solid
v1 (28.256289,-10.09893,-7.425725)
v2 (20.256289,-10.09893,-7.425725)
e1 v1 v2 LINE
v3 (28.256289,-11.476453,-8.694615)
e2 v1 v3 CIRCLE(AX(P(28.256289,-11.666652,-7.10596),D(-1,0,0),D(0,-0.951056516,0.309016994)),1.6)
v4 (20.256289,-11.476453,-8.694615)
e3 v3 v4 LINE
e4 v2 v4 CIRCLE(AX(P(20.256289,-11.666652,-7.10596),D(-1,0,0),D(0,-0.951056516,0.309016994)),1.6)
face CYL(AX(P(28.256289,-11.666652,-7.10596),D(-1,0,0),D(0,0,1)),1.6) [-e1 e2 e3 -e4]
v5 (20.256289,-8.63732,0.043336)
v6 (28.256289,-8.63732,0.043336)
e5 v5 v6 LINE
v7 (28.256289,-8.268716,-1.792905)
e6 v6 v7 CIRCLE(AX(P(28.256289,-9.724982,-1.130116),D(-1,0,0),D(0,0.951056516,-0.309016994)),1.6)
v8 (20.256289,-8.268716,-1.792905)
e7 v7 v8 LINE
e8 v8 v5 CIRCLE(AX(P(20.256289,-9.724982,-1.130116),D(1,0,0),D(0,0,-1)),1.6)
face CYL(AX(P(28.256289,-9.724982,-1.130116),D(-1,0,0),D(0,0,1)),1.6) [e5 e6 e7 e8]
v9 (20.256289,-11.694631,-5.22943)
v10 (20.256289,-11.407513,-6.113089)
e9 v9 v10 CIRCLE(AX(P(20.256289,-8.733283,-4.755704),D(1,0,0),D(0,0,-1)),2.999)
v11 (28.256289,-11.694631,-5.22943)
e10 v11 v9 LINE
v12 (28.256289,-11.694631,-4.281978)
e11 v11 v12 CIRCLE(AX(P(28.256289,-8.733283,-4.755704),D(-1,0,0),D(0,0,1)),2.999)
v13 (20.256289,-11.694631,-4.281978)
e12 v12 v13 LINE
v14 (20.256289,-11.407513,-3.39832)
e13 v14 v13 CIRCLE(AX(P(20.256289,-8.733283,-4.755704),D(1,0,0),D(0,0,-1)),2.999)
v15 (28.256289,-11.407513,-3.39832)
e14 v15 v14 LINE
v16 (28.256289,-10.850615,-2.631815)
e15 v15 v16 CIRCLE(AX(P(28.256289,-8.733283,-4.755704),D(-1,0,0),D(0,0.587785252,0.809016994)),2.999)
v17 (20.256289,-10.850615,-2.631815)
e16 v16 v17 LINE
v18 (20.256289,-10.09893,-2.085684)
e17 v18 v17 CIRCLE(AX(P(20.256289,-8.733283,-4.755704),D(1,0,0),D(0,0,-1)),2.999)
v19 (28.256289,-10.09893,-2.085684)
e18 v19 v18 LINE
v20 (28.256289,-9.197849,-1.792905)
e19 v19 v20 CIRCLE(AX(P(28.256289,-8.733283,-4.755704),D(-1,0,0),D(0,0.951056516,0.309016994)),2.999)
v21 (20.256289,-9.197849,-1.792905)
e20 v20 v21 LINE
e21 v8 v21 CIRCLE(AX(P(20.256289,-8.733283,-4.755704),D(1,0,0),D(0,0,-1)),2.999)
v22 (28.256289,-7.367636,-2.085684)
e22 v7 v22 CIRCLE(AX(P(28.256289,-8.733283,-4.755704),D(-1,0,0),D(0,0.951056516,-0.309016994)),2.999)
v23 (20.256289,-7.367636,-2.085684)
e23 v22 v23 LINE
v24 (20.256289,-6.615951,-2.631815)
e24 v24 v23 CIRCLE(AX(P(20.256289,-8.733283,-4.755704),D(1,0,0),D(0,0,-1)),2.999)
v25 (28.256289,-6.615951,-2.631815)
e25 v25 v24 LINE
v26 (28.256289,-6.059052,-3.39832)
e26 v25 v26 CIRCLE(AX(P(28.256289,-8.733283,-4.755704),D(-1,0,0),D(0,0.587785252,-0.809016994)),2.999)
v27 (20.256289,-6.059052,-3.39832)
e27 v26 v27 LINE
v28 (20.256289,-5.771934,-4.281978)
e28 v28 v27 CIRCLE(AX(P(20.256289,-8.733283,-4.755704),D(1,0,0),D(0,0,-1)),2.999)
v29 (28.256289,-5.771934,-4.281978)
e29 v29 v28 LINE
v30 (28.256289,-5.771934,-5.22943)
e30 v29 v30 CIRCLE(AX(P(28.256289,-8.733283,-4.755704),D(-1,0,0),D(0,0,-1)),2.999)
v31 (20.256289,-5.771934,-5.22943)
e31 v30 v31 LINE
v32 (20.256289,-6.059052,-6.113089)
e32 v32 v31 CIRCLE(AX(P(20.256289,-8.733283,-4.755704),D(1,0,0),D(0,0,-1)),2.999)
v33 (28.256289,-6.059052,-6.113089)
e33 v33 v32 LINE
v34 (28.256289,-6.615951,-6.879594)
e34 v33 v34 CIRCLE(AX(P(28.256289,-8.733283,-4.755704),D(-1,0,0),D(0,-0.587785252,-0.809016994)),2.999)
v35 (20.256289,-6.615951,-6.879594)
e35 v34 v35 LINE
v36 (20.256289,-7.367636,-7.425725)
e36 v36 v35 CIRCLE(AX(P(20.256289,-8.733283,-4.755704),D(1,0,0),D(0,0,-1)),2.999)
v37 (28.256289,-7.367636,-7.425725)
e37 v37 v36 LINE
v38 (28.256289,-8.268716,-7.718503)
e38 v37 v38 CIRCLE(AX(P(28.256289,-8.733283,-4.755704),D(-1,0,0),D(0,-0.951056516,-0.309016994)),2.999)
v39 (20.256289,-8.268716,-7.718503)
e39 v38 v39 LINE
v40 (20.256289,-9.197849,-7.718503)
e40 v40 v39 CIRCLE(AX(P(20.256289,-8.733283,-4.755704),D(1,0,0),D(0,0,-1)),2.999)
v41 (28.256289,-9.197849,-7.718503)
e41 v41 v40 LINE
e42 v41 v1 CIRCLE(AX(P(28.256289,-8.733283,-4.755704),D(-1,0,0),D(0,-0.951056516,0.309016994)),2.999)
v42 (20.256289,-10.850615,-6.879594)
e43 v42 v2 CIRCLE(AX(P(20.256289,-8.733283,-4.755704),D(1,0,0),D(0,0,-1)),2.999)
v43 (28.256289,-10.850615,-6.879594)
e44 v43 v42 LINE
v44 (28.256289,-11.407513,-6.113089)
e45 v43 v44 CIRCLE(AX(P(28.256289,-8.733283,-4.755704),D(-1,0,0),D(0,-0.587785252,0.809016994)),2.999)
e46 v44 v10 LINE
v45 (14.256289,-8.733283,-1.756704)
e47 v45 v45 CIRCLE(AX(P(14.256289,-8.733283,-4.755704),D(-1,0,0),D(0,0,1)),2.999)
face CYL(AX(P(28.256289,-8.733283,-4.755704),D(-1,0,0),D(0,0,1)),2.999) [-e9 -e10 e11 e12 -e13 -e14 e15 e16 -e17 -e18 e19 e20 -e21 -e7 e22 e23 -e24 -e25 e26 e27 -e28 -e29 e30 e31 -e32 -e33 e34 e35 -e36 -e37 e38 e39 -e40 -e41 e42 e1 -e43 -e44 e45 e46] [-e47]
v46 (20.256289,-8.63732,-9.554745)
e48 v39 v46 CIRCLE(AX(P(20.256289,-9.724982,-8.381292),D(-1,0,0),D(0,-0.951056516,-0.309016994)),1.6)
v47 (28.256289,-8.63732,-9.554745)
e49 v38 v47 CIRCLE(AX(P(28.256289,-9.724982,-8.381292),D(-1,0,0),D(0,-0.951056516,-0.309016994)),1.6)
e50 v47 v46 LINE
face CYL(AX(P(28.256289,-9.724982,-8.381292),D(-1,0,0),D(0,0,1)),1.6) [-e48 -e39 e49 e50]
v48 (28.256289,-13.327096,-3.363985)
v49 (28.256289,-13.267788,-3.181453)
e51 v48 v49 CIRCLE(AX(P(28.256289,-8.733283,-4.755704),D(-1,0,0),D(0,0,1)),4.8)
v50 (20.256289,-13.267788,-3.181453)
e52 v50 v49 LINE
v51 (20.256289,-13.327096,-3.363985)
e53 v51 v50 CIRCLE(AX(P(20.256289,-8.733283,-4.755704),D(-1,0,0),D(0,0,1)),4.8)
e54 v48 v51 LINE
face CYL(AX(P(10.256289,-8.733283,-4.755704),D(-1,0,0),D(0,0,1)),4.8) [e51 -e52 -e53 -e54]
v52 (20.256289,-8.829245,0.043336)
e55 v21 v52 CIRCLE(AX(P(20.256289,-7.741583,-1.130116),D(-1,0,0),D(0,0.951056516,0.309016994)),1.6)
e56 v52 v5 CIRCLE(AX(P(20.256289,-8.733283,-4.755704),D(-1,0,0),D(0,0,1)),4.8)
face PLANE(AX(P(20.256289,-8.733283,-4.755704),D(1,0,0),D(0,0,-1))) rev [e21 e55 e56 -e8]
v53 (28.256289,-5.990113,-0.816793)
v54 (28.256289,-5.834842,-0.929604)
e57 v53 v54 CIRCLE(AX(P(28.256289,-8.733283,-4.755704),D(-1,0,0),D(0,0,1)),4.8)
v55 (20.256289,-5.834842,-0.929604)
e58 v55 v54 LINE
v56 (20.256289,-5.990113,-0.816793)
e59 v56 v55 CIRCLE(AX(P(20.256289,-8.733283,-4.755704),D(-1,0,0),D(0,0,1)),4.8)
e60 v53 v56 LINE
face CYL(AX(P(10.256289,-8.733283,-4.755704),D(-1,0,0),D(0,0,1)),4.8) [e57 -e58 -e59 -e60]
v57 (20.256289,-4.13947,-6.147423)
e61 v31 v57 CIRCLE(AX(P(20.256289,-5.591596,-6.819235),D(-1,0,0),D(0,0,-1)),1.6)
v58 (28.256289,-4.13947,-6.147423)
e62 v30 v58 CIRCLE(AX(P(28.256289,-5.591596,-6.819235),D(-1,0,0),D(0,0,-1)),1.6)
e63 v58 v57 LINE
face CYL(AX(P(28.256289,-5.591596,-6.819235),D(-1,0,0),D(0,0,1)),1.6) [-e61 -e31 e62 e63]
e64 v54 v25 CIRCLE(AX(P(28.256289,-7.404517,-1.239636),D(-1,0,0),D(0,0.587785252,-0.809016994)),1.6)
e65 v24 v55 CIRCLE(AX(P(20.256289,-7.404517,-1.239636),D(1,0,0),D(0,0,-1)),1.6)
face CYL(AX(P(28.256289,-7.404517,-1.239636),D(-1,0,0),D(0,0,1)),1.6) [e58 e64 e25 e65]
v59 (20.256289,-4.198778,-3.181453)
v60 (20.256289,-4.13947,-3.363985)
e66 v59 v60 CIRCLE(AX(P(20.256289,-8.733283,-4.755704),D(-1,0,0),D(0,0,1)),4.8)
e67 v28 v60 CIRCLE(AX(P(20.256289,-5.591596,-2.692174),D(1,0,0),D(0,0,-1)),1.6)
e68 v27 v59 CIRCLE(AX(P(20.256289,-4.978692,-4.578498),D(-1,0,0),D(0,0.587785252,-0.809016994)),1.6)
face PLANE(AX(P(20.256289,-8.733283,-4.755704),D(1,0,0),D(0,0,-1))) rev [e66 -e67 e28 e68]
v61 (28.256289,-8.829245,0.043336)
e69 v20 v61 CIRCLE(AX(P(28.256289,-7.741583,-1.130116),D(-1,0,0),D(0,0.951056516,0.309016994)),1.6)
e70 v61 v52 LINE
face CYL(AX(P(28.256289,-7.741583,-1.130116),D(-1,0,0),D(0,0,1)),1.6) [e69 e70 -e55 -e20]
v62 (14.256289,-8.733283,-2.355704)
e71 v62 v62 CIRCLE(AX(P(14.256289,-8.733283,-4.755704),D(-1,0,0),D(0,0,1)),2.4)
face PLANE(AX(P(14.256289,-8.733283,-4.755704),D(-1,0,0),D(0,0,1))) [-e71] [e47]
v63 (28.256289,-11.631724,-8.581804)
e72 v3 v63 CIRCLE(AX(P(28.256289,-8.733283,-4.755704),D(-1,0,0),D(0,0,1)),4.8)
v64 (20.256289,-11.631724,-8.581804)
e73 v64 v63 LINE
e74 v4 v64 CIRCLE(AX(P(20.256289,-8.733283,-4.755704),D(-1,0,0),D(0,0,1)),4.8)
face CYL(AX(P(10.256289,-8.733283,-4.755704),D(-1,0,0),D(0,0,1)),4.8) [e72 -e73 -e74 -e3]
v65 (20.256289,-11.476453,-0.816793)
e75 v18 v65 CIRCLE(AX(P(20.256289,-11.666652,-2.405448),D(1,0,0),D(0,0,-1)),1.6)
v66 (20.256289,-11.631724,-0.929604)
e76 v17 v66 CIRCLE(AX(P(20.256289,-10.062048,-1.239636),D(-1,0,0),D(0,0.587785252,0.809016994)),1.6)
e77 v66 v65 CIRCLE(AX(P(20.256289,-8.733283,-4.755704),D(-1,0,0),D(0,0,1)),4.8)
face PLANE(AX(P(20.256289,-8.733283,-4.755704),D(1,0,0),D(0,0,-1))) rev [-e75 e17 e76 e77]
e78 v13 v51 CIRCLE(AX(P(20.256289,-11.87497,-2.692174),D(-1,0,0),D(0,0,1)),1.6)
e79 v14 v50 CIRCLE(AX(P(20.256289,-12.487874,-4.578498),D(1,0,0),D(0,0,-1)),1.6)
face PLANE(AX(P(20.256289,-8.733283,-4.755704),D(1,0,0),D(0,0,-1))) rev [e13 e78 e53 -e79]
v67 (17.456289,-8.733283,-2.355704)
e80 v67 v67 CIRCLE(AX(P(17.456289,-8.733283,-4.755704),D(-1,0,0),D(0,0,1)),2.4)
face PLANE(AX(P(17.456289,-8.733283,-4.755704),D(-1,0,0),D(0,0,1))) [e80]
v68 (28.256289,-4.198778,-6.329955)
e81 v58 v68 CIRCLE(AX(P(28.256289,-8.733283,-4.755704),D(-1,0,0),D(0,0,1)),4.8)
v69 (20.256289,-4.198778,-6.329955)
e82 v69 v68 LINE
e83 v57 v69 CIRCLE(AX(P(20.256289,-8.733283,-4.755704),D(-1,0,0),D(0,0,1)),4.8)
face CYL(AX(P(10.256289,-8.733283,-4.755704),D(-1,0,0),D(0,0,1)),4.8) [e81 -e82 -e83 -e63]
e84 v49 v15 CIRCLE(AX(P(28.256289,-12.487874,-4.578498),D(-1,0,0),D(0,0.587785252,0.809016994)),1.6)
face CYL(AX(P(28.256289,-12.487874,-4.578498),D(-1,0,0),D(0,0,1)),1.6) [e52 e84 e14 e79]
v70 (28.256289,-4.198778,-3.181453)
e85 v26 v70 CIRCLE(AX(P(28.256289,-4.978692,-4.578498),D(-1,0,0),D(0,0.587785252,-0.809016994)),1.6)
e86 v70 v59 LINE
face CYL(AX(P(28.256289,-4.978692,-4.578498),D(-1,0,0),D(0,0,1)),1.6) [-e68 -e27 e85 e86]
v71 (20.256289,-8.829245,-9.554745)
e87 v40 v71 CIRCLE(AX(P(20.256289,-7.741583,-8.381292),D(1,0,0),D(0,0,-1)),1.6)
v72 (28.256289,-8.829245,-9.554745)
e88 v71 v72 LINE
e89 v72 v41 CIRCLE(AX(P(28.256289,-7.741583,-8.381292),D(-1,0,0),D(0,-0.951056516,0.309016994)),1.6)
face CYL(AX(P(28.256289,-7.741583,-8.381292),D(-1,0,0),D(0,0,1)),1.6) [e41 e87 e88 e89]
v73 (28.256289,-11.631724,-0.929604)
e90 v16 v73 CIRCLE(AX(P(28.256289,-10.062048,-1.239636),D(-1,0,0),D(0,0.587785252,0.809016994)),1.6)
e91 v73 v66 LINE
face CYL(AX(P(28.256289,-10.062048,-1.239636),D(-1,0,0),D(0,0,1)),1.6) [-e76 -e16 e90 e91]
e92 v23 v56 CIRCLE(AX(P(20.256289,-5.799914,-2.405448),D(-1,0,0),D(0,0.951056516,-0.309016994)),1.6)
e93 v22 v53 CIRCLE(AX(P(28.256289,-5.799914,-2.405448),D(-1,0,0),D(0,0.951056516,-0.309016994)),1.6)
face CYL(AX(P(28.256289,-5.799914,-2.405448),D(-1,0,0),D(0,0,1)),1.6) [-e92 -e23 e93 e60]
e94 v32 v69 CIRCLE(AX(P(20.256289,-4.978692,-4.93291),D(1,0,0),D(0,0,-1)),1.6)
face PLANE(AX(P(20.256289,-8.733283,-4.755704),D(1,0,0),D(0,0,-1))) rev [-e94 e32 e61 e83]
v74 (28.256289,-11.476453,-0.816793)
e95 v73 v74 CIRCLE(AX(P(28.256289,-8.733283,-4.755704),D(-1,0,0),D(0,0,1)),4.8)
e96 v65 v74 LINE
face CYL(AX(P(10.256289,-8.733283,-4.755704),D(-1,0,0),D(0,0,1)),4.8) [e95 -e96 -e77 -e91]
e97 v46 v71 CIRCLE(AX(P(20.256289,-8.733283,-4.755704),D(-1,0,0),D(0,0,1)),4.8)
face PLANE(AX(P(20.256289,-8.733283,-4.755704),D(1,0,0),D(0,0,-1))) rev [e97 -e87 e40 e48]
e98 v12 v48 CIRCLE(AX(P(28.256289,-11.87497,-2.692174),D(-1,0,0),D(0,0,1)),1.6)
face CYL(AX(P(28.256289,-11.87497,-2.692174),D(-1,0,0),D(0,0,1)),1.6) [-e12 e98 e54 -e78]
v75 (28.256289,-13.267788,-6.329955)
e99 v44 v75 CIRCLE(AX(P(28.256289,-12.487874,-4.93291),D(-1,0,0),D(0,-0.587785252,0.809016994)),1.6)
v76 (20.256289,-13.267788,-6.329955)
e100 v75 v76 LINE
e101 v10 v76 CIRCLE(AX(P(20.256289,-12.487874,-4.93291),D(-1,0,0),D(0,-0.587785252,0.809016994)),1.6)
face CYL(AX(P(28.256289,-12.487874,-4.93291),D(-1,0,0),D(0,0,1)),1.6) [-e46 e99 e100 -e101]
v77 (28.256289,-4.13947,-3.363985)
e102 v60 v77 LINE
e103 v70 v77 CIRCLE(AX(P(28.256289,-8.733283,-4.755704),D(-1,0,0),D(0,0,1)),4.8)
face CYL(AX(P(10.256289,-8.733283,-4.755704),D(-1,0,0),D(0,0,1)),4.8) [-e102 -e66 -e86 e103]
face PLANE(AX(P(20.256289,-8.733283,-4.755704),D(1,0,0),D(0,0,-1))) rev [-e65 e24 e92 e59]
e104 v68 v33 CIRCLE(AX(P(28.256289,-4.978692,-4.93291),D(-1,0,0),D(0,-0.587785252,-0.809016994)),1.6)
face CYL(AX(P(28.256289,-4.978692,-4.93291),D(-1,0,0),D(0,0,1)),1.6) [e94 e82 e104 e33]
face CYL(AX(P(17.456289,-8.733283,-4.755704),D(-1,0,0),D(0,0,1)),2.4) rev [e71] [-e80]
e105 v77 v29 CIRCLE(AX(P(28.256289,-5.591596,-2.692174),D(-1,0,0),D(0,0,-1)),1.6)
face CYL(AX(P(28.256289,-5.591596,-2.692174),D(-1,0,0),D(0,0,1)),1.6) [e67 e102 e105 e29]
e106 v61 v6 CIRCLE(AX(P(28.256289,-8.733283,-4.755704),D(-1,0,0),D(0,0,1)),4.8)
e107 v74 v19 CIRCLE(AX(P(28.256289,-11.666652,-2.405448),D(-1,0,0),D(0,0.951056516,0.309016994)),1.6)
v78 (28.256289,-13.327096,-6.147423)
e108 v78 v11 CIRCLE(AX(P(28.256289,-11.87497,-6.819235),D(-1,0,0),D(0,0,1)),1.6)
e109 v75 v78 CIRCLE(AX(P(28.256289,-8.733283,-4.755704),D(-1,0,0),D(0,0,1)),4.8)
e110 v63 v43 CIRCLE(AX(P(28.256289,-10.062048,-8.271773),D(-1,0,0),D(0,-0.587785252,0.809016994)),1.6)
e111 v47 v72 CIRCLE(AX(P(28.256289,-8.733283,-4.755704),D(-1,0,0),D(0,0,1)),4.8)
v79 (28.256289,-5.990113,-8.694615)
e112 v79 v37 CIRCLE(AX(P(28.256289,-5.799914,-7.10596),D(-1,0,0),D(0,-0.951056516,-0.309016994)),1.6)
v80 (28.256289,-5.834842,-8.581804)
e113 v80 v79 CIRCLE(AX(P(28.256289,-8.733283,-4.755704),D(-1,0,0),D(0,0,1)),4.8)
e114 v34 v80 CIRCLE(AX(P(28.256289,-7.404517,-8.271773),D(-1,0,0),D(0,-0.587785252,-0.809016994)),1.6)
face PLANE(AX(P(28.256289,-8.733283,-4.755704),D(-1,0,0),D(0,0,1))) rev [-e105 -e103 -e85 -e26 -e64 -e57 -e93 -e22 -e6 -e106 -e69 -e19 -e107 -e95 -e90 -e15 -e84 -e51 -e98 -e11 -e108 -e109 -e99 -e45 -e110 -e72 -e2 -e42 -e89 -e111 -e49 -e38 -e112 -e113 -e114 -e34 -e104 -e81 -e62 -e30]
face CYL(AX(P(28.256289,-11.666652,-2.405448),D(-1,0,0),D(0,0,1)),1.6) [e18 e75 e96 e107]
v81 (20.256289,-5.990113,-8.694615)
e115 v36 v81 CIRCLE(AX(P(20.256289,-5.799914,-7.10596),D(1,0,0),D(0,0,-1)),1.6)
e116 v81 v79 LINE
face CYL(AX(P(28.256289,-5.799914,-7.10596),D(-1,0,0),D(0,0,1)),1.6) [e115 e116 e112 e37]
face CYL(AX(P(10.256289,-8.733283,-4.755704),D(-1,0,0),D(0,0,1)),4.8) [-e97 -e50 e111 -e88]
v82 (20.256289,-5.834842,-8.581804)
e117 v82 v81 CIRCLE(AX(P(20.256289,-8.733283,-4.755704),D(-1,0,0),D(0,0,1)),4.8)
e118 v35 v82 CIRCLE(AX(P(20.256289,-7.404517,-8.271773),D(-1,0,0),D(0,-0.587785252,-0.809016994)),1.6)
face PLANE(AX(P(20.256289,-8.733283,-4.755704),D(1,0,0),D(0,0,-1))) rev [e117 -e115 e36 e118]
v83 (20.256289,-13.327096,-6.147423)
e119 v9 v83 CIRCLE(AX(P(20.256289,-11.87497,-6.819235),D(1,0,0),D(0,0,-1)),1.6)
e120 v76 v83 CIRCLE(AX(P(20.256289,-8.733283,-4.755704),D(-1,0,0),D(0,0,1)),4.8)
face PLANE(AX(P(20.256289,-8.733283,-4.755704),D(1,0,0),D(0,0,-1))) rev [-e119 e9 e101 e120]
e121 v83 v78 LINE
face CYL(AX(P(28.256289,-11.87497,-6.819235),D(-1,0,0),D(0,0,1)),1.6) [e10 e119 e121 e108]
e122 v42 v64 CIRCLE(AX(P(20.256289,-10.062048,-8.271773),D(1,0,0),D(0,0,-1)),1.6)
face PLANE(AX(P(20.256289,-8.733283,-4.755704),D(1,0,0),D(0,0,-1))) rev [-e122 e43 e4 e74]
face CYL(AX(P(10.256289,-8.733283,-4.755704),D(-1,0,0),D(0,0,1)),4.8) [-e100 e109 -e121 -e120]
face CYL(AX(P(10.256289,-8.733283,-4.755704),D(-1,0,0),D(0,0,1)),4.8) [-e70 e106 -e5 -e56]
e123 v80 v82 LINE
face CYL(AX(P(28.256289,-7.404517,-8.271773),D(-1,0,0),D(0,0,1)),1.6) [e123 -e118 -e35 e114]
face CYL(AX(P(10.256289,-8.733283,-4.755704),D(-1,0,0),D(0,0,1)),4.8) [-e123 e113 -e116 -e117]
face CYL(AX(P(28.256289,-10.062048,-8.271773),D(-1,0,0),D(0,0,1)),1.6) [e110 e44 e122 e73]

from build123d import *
from build123d.topology import SkipClean

# Parameters (mm, degrees)
ISO_START                                 = 20.256289073
ISO_SPUR_GEAR_0_8M_10T_20PA_8FW_2_R       = 0.4
ISO_SPUR_GEAR_0_8M_10T_20PA_8FW_S10_DEPTH = 8
BOSS_EXTRUDE1_DEPTH                       = 6
BOSS_EXTRUDE1_DEPTH_BACK                  = 8
SKETCH1_R                                 = 2.999
SKETCH2_R                                 = 2.4
CUT_EXTRUDE1_DEPTH                        = 3.2


# Read off the part's stored shape, not the designer's step: ISO - Spur gear 0.8M 10T 20PA 8FW ---S10A75H50L0.8N
with BuildPart() as part:
    # ISO - Spur gear 0.8M 10T 20PA 8FW -- 2 → ISO - Spur gear 0.8M 10T 20PA 8FW ---S10 (new body)
    with BuildSketch(Plane.YZ.offset(ISO_START)):
        with BuildLine():
            ThreePointArc((-8.829245422, -9.554744908), (-8.733282752, -9.555704257), (-8.637320082, -9.554744908))
            ThreePointArc((-8.637320082, -9.554744908), (-8.156276182, -8.696191622), (-8.268716011, -7.718503397))
            ThreePointArc((-8.268716011, -7.718503397), (-7.806540786, -7.60792275), (-7.367635501, -7.425724592))
            ThreePointArc((-7.367635501, -7.425724592), (-6.883930514, -8.282781454), (-5.990112863, -8.694615143))
            ThreePointArc((-5.990112863, -8.694615143), (-5.911913541, -8.63898583), (-5.834842001, -8.581804258))
            ThreePointArc((-5.834842001, -8.581804258), (-5.950314271, -7.604469549), (-6.615950723, -6.879593633))
            ThreePointArc((-6.615950723, -6.879593633), (-6.307040786, -6.518472229), (-6.059052342, -6.113088769))
            ThreePointArc((-6.059052342, -6.113088769), (-5.163961403, -6.522147678), (-4.198777965, -6.329955298))
            ThreePointArc((-4.198777965, -6.329955298), (-4.168211474, -6.23898583), (-4.139469773, -6.147423452))
            ThreePointArc((-4.139469773, -6.147423452), (-4.807351731, -5.42461596), (-5.771934306, -5.229430316))
            ThreePointArc((-5.771934306, -5.229430316), (-5.734282752, -4.755704258), (-5.771934306, -4.281978199))
            ThreePointArc((-5.771934306, -4.281978199), (-4.807351731, -4.086792554), (-4.139469773, -3.363985063))
            ThreePointArc((-4.139469773, -3.363985063), (-4.168211474, -3.272422685), (-4.198777965, -3.181453217))
            ThreePointArc((-4.198777965, -3.181453217), (-5.163961403, -2.989260837), (-6.059052342, -3.398319746))
            ThreePointArc((-6.059052342, -3.398319746), (-6.307040786, -2.992936286), (-6.615950723, -2.631814882))
            ThreePointArc((-6.615950723, -2.631814882), (-5.950314271, -1.906938966), (-5.834842001, -0.929604257))
            ThreePointArc((-5.834842001, -0.929604257), (-5.91191354, -0.872422684), (-5.990112863, -0.816793372))
            ThreePointArc((-5.990112863, -0.816793372), (-6.883930514, -1.228627061), (-7.367635501, -2.085683923))
            ThreePointArc((-7.367635501, -2.085683923), (-7.806540786, -1.903485765), (-8.268716011, -1.792905118))
            ThreePointArc((-8.268716011, -1.792905118), (-8.156276182, -0.815216893), (-8.637320082, 0.043336393))
            ThreePointArc((-8.637320082, 0.043336393), (-8.733282752, 0.044295743), (-8.829245422, 0.043336393))
            ThreePointArc((-8.829245422, 0.043336393), (-9.310289322, -0.815216893), (-9.197849493, -1.792905118))
            ThreePointArc((-9.197849493, -1.792905118), (-9.660024718, -1.903485765), (-10.098930003, -2.085683923))
            ThreePointArc((-10.098930003, -2.085683923), (-10.58263499, -1.228627061), (-11.476452641, -0.816793372))
            ThreePointArc((-11.476452641, -0.816793372), (-11.554651964, -0.872422684), (-11.631723503, -0.929604257))
            ThreePointArc((-11.631723503, -0.929604257), (-11.516251233, -1.906938966), (-10.850614781, -2.631814882))
            ThreePointArc((-10.850614781, -2.631814882), (-11.159524718, -2.992936286), (-11.407513162, -3.398319746))
            ThreePointArc((-11.407513162, -3.398319746), (-12.302604101, -2.989260837), (-13.267787539, -3.181453217))
            ThreePointArc((-13.267787539, -3.181453217), (-13.29835403, -3.272422685), (-13.327095731, -3.363985063))
            ThreePointArc((-13.327095731, -3.363985063), (-12.659213773, -4.086792554), (-11.694631199, -4.281978199))
            ThreePointArc((-11.694631199, -4.281978199), (-11.732282752, -4.755704258), (-11.694631199, -5.229430316))
            ThreePointArc((-11.694631199, -5.229430316), (-12.659213774, -5.42461596), (-13.327095731, -6.147423452))
            ThreePointArc((-13.327095731, -6.147423452), (-13.29835403, -6.23898583), (-13.267787539, -6.329955298))
            ThreePointArc((-13.267787539, -6.329955298), (-12.302604101, -6.522147678), (-11.407513162, -6.113088769))
            ThreePointArc((-11.407513162, -6.113088769), (-11.159524718, -6.518472229), (-10.850614781, -6.879593633))
            ThreePointArc((-10.850614781, -6.879593633), (-11.516251233, -7.604469549), (-11.631723503, -8.581804258))
            ThreePointArc((-11.631723503, -8.581804258), (-11.554651963, -8.63898583), (-11.476452641, -8.694615143))
            ThreePointArc((-11.476452641, -8.694615143), (-10.58263499, -8.282781454), (-10.098930003, -7.425724592))
            ThreePointArc((-10.098930003, -7.425724592), (-9.660024718, -7.60792275), (-9.197849493, -7.718503397))
            ThreePointArc((-9.197849493, -7.718503397), (-9.310289322, -8.696191622), (-8.829245422, -9.554744908))
        make_face()
        with Locations((-8.733282752, -4.755704257)):
            Circle(ISO_SPUR_GEAR_0_8M_10T_20PA_8FW_2_R, mode=Mode.SUBTRACT)
    extrude(amount=ISO_SPUR_GEAR_0_8M_10T_20PA_8FW_S10_DEPTH)

    # Sketch1 → Boss-Extrude1 (add, two sides: drawn at the far end of the back side and taken through both)
    with SkipClean():  # the faces are left unmerged after this step: merging them gives an invalid solid
        with BuildSketch(Plane.ZY.offset(-20.256289073).offset(-BOSS_EXTRUDE1_DEPTH_BACK)):
            with Locations((-4.755704257, -8.733282752)):
                Circle(SKETCH1_R)
        extrude(amount=BOSS_EXTRUDE1_DEPTH + BOSS_EXTRUDE1_DEPTH_BACK)

    # Sketch2 → Cut-Extrude1 (cut)
    with SkipClean():  # the faces are left unmerged after this step: merging them gives an invalid solid
        with BuildSketch(Plane.ZY.offset(-14.256289073)):
            with Locations((-4.755704257, -8.733282752)):
                Circle(SKETCH2_R)
        extrude(amount=-CUT_EXTRUDE1_DEPTH, mode=Mode.SUBTRACT)


solid = part.part
